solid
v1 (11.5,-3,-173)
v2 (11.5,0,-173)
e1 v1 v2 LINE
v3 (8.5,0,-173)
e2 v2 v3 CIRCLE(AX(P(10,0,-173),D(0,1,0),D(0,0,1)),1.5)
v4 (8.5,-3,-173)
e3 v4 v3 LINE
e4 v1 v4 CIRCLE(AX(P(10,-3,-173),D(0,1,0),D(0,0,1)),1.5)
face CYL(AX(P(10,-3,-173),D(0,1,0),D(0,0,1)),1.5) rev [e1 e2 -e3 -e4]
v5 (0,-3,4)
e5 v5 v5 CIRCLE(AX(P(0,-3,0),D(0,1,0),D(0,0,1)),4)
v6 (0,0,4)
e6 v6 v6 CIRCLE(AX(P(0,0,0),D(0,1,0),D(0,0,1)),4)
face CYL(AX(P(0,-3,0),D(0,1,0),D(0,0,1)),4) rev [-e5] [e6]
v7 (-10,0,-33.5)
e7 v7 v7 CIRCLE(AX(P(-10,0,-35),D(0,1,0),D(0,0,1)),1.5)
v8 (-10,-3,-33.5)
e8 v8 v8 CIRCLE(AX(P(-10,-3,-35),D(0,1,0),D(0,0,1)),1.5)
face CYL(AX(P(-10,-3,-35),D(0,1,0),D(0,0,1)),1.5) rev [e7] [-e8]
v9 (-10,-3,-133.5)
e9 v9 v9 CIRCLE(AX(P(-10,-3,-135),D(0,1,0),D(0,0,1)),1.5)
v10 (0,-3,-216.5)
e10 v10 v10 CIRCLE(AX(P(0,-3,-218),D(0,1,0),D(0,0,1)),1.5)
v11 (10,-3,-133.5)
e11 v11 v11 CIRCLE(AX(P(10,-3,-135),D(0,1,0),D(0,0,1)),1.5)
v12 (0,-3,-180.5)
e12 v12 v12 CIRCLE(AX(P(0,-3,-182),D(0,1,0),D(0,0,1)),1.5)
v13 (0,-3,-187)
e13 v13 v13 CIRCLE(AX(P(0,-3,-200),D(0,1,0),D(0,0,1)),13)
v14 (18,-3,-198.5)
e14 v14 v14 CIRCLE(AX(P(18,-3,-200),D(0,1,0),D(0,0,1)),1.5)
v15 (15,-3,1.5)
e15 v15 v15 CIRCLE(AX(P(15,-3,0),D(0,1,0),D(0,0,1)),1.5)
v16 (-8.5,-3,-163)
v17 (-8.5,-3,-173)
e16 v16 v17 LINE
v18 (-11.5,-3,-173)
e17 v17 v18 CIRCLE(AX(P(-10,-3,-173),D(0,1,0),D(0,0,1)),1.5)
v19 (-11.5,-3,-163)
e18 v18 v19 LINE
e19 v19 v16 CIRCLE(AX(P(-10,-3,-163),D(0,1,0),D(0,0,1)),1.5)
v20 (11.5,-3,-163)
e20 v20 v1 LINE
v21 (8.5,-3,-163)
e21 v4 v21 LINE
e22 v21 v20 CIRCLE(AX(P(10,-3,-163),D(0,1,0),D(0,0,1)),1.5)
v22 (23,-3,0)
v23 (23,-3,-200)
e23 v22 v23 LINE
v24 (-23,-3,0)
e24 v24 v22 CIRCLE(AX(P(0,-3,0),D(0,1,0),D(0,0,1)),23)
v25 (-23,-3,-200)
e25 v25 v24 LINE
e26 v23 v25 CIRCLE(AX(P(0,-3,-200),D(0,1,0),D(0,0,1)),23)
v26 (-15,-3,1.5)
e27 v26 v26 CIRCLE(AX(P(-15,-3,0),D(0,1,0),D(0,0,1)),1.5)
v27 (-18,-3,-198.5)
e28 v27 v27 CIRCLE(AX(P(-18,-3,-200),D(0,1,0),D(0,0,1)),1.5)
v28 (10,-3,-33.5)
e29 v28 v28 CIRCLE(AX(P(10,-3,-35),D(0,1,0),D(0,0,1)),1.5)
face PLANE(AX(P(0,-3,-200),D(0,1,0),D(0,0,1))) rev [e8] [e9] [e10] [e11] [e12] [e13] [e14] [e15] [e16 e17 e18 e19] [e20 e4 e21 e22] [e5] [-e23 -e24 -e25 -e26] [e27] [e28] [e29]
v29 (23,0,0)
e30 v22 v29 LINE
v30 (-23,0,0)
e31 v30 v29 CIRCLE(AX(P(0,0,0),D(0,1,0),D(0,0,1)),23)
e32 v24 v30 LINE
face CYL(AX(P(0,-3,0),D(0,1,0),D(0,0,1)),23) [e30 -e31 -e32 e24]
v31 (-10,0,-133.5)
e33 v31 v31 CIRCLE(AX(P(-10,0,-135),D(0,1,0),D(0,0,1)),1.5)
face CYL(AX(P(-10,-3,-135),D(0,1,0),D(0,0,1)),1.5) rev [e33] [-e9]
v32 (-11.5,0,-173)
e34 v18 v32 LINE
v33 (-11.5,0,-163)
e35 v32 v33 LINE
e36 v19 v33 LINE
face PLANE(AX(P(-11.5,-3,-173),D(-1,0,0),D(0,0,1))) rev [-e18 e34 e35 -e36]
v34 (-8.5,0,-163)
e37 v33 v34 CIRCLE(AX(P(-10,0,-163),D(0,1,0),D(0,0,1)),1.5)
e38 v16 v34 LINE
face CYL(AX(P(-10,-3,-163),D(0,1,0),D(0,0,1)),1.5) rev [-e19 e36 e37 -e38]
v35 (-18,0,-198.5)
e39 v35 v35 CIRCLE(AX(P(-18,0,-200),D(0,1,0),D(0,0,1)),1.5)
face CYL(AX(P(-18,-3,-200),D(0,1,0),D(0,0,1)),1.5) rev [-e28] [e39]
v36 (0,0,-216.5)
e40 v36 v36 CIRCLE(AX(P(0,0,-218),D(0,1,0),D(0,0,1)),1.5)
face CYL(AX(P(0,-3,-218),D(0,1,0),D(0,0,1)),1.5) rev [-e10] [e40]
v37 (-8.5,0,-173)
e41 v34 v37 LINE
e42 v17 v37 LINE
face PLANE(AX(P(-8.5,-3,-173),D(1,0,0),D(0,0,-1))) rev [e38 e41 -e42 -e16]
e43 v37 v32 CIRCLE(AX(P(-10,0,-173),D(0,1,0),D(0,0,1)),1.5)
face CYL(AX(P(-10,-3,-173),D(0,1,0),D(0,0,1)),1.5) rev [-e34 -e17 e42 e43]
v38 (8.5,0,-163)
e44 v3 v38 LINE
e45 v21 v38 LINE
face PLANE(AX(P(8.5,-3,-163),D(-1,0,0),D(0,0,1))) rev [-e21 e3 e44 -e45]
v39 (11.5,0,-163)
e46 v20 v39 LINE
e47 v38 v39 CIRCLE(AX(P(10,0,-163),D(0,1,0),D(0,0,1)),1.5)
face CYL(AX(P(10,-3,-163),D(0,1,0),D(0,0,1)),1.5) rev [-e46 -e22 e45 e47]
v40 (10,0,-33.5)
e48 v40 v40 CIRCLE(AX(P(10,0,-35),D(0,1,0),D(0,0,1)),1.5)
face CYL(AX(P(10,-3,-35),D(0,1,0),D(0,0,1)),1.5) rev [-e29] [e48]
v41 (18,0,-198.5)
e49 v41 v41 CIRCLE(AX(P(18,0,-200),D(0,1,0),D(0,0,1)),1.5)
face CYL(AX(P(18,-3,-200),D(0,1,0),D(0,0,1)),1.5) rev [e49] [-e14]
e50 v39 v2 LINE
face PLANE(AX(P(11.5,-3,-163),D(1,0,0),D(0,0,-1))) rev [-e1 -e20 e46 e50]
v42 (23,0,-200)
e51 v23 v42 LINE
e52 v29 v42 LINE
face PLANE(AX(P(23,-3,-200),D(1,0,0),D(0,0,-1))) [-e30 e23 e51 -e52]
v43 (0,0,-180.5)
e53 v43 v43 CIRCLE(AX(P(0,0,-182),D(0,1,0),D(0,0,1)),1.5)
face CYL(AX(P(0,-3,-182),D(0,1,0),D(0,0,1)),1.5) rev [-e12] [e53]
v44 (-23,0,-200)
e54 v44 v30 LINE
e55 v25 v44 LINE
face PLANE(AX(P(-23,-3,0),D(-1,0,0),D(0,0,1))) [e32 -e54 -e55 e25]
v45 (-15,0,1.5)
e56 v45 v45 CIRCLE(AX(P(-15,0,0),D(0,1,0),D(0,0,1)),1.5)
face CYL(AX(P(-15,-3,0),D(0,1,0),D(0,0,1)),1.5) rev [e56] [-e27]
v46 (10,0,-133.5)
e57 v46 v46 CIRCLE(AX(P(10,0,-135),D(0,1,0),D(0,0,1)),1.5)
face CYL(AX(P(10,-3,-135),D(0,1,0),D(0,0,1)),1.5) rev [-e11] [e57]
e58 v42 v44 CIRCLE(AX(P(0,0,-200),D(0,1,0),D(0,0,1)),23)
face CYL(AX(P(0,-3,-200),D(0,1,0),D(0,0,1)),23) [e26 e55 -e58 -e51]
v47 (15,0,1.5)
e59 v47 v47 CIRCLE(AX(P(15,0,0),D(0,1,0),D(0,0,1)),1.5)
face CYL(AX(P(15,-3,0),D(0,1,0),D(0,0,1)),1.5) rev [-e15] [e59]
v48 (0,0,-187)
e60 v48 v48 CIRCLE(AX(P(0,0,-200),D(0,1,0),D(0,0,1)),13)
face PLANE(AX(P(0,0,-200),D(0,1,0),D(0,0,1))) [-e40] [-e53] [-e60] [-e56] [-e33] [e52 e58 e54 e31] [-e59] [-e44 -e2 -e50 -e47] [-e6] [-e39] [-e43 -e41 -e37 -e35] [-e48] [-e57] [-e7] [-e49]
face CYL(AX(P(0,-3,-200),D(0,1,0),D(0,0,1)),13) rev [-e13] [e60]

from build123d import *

# Parameters (mm, degrees)
SKETCH_1_R             = 4
SKETCH_1_R_2           = 1.5
SKETCH_1_R_3           = 13
SM_BASE_FLANGE_1_DEPTH = 3


# Sheet-metal steps are written as plain solids
with BuildPart() as part:
    # Sketch 1 → 基体-法兰1 (new body)
    with BuildSketch(Plane(origin=(0, 0, 0), x_dir=(1, 0, 0), z_dir=(0, 1, 0))):
        with BuildLine():
            Line((23, 200), (23, 0))
            ThreePointArc((23, 0), (0, -23), (-23, 0))
            Line((-23, 0), (-23, 200))
            ThreePointArc((-23, 200), (0, 223), (23, 200))
        make_face()
        with Locations(Location((0, 0, 0), (0, 0, 270))):
            Circle(SKETCH_1_R, mode=Mode.SUBTRACT)
        with Locations(Location((-10, 35, 0), (0, 0, 270))):
            Circle(SKETCH_1_R_2, mode=Mode.SUBTRACT)
        with Locations(Location((10, 35, 0), (0, 0, 270))):
            Circle(SKETCH_1_R_2, mode=Mode.SUBTRACT)
        with Locations(Location((-10, 135, 0), (0, 0, 270))):
            Circle(SKETCH_1_R_2, mode=Mode.SUBTRACT)
        with Locations(Location((10, 135, 0), (0, 0, 270))):
            Circle(SKETCH_1_R_2, mode=Mode.SUBTRACT)
        with Locations(Location((0, 200, 0), (0, 0, 270))):
            Circle(SKETCH_1_R_3, mode=Mode.SUBTRACT)
        with Locations(Location((15, 0, 0), (0, 0, 270))):
            Circle(SKETCH_1_R_2, mode=Mode.SUBTRACT)
        with Locations(Location((-15, 0, 0), (0, 0, 270))):
            Circle(SKETCH_1_R_2, mode=Mode.SUBTRACT)
        with Locations(Location((0, 218, 0), (0, 0, 270))):
            Circle(SKETCH_1_R_2, mode=Mode.SUBTRACT)
        with Locations(Location((18, 200, 0), (0, 0, 270))):
            Circle(SKETCH_1_R_2, mode=Mode.SUBTRACT)
        with Locations(Location((0, 182, 0), (0, 0, 270))):
            Circle(SKETCH_1_R_2, mode=Mode.SUBTRACT)
        with Locations(Location((-18, 200, 0), (0, 0, 270))):
            Circle(SKETCH_1_R_2, mode=Mode.SUBTRACT)
        with BuildLine():
            Line((-8.5, 173), (-8.5, 163))
            ThreePointArc((-8.5, 163), (-10, 161.5), (-11.5, 163))
            Line((-11.5, 163), (-11.5, 173))
            ThreePointArc((-11.5, 173), (-10, 174.5), (-8.5, 173))
        make_face(mode=Mode.SUBTRACT)
        with BuildLine():
            Line((8.5, 163), (8.5, 173))
            ThreePointArc((8.5, 173), (10, 174.5), (11.5, 173))
            Line((11.5, 173), (11.5, 163))
            ThreePointArc((11.5, 163), (10, 161.5), (8.5, 163))
        make_face(mode=Mode.SUBTRACT)
    extrude(amount=-SM_BASE_FLANGE_1_DEPTH)


solid = part.part
